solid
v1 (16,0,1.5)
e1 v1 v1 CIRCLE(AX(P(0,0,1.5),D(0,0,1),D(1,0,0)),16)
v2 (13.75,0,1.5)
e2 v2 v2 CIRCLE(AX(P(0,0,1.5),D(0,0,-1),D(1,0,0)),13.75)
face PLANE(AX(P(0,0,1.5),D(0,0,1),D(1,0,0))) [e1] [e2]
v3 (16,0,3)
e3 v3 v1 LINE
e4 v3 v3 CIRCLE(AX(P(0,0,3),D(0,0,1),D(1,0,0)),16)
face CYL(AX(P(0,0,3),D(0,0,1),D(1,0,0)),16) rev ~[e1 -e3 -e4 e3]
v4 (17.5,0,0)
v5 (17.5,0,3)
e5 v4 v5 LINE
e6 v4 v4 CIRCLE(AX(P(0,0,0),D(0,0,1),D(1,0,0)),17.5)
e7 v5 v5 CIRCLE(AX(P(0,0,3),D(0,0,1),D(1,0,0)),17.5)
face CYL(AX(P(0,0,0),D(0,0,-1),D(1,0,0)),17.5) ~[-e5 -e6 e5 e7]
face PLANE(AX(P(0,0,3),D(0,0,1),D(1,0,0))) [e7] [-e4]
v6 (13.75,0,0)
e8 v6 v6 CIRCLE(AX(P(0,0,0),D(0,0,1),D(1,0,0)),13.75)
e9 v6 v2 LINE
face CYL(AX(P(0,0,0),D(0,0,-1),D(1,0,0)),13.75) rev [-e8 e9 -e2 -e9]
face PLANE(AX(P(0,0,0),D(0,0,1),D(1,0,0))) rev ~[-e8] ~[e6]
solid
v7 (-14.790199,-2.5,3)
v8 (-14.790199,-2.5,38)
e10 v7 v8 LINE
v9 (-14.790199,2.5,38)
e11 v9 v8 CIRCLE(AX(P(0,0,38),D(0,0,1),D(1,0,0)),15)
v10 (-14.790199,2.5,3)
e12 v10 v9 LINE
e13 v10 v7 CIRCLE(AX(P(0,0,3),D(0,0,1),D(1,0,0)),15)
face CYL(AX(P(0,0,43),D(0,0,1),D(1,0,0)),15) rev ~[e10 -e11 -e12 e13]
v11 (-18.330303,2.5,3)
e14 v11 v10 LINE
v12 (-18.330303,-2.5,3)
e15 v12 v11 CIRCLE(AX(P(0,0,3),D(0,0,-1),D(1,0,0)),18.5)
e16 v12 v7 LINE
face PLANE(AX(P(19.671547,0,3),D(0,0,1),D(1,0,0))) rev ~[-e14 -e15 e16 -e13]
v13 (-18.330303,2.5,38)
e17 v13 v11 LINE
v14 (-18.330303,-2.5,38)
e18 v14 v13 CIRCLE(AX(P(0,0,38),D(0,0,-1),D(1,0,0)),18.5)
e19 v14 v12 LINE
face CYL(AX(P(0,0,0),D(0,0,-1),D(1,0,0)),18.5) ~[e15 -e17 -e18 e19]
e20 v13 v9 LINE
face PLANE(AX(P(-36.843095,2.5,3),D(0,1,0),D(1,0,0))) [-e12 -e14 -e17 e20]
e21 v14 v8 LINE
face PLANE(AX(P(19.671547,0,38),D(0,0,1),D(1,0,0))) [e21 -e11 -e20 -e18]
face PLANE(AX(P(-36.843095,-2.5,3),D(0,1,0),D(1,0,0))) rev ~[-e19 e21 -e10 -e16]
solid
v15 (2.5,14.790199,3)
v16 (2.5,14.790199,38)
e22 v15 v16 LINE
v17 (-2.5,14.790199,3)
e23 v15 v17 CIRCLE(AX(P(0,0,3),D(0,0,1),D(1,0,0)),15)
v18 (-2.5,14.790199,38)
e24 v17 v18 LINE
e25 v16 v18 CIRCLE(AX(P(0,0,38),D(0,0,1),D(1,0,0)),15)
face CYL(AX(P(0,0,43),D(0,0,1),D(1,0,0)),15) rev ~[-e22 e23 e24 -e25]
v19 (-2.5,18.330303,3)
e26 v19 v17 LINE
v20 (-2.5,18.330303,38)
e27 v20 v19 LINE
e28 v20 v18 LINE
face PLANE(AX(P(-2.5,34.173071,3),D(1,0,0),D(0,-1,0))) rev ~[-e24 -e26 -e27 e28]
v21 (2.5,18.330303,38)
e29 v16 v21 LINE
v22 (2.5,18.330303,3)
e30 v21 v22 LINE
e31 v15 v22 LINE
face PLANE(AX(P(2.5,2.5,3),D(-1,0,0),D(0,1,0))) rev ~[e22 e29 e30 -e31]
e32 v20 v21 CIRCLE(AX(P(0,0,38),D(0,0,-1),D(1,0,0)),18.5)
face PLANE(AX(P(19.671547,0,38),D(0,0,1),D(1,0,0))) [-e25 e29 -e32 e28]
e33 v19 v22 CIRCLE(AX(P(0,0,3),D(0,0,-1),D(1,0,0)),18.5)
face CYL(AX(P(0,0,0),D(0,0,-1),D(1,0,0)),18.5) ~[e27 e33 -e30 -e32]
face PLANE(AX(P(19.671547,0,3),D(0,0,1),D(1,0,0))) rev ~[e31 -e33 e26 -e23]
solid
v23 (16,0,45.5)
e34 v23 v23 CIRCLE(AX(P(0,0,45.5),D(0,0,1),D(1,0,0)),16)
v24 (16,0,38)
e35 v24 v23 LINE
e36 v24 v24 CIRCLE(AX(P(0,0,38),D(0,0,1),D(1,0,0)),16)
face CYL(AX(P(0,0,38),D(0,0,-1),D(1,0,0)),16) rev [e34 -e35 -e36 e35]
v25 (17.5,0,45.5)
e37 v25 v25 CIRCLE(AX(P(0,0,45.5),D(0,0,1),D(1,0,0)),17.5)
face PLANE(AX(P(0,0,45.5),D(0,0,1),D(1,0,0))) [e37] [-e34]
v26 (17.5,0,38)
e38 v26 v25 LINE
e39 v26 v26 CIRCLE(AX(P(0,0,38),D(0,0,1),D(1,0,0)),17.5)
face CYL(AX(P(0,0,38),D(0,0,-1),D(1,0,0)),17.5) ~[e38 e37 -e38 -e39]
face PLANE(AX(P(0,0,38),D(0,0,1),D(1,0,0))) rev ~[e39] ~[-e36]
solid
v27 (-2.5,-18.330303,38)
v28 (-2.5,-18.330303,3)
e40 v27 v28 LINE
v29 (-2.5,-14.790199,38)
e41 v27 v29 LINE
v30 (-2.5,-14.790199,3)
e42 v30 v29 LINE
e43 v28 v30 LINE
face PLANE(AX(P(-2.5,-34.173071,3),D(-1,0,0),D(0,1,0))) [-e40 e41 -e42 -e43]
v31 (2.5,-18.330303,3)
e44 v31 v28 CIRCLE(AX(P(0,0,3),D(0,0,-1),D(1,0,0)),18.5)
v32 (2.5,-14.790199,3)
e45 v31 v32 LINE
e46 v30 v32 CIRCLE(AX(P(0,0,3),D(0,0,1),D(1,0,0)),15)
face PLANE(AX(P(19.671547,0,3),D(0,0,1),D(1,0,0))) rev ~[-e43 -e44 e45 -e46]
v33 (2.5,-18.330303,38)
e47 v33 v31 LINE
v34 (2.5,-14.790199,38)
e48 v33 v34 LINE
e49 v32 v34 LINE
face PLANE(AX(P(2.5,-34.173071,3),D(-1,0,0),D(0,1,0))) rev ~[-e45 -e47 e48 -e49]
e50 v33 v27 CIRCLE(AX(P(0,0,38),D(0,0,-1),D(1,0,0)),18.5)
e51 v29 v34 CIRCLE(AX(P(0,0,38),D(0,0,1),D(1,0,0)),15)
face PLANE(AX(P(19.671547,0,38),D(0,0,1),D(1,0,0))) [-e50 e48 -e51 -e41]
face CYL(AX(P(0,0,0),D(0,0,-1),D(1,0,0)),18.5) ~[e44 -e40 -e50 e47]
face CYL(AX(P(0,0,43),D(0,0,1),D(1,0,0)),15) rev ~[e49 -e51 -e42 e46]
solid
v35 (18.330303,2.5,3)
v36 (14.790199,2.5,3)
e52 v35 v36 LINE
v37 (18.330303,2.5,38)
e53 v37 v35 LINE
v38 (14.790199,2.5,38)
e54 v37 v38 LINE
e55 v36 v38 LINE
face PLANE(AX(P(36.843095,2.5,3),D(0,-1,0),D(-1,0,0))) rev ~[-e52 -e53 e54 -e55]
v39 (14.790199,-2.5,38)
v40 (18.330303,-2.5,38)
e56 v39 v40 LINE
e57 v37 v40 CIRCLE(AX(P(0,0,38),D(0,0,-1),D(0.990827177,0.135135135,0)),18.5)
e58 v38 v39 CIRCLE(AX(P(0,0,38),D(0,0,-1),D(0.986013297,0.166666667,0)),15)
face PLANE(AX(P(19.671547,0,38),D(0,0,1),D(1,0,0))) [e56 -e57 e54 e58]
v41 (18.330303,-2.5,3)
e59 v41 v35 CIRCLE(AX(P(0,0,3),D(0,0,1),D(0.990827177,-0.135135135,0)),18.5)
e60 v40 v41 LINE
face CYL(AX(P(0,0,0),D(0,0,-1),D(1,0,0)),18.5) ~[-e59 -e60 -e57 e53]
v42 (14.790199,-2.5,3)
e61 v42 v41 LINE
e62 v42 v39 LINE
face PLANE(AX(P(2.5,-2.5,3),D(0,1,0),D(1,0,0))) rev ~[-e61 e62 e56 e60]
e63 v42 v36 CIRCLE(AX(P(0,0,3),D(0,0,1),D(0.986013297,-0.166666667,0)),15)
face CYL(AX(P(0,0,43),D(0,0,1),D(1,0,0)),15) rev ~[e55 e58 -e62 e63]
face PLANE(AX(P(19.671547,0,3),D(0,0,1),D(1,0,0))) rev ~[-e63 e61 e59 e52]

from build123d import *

# Parameters (mm, degrees)
F0_R      = 18.5
F0_R_2    = 13.75
F1_DEPTH  = 43
F2_R      = 15
F2_R_2    = 13.75
F3_DEPTH  = 41.5
F5_W      = 34.3430949748
F5_H      = 5
F5_W_2    = 5
F5_H_2    = 31.6730713844
F6_DEPTH  = 35
F7_R      = 17.5
F7_R_2    = 13.75
F8_DEPTH  = 3
F10_R     = 17.5
F10_R_2   = 16
F11_DEPTH = 7.5
F12_R     = 16
F13_DEPTH = 1.5


# Not quite as in the source:
# - a feature names something its author has since deleted; it is built from what else it names


with BuildPart() as f1:
    # F0 (on Top) → F1 (new body)
    with BuildSketch(Plane.XY):
        Circle(F0_R)
        Circle(F0_R_2, mode=Mode.SUBTRACT)
    extrude(amount=F1_DEPTH)

    # F2 (on face) → F3 (cut)
    with BuildSketch(Plane.XY.offset(43)):
        Circle(F2_R)
        Circle(F2_R_2, mode=Mode.SUBTRACT)
    extrude(amount=-F3_DEPTH, mode=Mode.SUBTRACT)

    # F5 (on offset) → F6 (intersect)
    with BuildSketch(Plane.XY.offset(3)):
        with Locations((19.6715474874, 0)):
            Rectangle(F5_W, F5_H)
        Rectangle(F5_W_2, F5_H)
        with Locations((0, 18.3365356922)):
            Rectangle(F5_W_2, F5_H_2)
        with Locations((-19.6715474874, 0)):
            Rectangle(F5_W, F5_H)
        with Locations((0, -18.3365356922)):
            Rectangle(F5_W_2, F5_H_2)
    extrude(amount=F6_DEPTH, mode=Mode.INTERSECT)


with BuildPart() as f8:
    # F7 (on Top) → F8 (new body)
    with BuildSketch(Plane.XY):
        Circle(F7_R)
        Circle(F7_R_2, mode=Mode.SUBTRACT)
    extrude(amount=F8_DEPTH)

    # F12 (on face) → F13 (cut)
    with BuildSketch(Plane.XY.offset(3)):
        Circle(F12_R)
    extrude(amount=-F13_DEPTH, mode=Mode.SUBTRACT)


with BuildPart() as f11:
    # F10 (on offset) → F11 (new body)
    with BuildSketch(Plane.XY.offset(38)):
        Circle(F10_R)
        Circle(F10_R_2, mode=Mode.SUBTRACT)
    extrude(amount=F11_DEPTH)


solid = Compound([f1.part, f8.part, f11.part])
